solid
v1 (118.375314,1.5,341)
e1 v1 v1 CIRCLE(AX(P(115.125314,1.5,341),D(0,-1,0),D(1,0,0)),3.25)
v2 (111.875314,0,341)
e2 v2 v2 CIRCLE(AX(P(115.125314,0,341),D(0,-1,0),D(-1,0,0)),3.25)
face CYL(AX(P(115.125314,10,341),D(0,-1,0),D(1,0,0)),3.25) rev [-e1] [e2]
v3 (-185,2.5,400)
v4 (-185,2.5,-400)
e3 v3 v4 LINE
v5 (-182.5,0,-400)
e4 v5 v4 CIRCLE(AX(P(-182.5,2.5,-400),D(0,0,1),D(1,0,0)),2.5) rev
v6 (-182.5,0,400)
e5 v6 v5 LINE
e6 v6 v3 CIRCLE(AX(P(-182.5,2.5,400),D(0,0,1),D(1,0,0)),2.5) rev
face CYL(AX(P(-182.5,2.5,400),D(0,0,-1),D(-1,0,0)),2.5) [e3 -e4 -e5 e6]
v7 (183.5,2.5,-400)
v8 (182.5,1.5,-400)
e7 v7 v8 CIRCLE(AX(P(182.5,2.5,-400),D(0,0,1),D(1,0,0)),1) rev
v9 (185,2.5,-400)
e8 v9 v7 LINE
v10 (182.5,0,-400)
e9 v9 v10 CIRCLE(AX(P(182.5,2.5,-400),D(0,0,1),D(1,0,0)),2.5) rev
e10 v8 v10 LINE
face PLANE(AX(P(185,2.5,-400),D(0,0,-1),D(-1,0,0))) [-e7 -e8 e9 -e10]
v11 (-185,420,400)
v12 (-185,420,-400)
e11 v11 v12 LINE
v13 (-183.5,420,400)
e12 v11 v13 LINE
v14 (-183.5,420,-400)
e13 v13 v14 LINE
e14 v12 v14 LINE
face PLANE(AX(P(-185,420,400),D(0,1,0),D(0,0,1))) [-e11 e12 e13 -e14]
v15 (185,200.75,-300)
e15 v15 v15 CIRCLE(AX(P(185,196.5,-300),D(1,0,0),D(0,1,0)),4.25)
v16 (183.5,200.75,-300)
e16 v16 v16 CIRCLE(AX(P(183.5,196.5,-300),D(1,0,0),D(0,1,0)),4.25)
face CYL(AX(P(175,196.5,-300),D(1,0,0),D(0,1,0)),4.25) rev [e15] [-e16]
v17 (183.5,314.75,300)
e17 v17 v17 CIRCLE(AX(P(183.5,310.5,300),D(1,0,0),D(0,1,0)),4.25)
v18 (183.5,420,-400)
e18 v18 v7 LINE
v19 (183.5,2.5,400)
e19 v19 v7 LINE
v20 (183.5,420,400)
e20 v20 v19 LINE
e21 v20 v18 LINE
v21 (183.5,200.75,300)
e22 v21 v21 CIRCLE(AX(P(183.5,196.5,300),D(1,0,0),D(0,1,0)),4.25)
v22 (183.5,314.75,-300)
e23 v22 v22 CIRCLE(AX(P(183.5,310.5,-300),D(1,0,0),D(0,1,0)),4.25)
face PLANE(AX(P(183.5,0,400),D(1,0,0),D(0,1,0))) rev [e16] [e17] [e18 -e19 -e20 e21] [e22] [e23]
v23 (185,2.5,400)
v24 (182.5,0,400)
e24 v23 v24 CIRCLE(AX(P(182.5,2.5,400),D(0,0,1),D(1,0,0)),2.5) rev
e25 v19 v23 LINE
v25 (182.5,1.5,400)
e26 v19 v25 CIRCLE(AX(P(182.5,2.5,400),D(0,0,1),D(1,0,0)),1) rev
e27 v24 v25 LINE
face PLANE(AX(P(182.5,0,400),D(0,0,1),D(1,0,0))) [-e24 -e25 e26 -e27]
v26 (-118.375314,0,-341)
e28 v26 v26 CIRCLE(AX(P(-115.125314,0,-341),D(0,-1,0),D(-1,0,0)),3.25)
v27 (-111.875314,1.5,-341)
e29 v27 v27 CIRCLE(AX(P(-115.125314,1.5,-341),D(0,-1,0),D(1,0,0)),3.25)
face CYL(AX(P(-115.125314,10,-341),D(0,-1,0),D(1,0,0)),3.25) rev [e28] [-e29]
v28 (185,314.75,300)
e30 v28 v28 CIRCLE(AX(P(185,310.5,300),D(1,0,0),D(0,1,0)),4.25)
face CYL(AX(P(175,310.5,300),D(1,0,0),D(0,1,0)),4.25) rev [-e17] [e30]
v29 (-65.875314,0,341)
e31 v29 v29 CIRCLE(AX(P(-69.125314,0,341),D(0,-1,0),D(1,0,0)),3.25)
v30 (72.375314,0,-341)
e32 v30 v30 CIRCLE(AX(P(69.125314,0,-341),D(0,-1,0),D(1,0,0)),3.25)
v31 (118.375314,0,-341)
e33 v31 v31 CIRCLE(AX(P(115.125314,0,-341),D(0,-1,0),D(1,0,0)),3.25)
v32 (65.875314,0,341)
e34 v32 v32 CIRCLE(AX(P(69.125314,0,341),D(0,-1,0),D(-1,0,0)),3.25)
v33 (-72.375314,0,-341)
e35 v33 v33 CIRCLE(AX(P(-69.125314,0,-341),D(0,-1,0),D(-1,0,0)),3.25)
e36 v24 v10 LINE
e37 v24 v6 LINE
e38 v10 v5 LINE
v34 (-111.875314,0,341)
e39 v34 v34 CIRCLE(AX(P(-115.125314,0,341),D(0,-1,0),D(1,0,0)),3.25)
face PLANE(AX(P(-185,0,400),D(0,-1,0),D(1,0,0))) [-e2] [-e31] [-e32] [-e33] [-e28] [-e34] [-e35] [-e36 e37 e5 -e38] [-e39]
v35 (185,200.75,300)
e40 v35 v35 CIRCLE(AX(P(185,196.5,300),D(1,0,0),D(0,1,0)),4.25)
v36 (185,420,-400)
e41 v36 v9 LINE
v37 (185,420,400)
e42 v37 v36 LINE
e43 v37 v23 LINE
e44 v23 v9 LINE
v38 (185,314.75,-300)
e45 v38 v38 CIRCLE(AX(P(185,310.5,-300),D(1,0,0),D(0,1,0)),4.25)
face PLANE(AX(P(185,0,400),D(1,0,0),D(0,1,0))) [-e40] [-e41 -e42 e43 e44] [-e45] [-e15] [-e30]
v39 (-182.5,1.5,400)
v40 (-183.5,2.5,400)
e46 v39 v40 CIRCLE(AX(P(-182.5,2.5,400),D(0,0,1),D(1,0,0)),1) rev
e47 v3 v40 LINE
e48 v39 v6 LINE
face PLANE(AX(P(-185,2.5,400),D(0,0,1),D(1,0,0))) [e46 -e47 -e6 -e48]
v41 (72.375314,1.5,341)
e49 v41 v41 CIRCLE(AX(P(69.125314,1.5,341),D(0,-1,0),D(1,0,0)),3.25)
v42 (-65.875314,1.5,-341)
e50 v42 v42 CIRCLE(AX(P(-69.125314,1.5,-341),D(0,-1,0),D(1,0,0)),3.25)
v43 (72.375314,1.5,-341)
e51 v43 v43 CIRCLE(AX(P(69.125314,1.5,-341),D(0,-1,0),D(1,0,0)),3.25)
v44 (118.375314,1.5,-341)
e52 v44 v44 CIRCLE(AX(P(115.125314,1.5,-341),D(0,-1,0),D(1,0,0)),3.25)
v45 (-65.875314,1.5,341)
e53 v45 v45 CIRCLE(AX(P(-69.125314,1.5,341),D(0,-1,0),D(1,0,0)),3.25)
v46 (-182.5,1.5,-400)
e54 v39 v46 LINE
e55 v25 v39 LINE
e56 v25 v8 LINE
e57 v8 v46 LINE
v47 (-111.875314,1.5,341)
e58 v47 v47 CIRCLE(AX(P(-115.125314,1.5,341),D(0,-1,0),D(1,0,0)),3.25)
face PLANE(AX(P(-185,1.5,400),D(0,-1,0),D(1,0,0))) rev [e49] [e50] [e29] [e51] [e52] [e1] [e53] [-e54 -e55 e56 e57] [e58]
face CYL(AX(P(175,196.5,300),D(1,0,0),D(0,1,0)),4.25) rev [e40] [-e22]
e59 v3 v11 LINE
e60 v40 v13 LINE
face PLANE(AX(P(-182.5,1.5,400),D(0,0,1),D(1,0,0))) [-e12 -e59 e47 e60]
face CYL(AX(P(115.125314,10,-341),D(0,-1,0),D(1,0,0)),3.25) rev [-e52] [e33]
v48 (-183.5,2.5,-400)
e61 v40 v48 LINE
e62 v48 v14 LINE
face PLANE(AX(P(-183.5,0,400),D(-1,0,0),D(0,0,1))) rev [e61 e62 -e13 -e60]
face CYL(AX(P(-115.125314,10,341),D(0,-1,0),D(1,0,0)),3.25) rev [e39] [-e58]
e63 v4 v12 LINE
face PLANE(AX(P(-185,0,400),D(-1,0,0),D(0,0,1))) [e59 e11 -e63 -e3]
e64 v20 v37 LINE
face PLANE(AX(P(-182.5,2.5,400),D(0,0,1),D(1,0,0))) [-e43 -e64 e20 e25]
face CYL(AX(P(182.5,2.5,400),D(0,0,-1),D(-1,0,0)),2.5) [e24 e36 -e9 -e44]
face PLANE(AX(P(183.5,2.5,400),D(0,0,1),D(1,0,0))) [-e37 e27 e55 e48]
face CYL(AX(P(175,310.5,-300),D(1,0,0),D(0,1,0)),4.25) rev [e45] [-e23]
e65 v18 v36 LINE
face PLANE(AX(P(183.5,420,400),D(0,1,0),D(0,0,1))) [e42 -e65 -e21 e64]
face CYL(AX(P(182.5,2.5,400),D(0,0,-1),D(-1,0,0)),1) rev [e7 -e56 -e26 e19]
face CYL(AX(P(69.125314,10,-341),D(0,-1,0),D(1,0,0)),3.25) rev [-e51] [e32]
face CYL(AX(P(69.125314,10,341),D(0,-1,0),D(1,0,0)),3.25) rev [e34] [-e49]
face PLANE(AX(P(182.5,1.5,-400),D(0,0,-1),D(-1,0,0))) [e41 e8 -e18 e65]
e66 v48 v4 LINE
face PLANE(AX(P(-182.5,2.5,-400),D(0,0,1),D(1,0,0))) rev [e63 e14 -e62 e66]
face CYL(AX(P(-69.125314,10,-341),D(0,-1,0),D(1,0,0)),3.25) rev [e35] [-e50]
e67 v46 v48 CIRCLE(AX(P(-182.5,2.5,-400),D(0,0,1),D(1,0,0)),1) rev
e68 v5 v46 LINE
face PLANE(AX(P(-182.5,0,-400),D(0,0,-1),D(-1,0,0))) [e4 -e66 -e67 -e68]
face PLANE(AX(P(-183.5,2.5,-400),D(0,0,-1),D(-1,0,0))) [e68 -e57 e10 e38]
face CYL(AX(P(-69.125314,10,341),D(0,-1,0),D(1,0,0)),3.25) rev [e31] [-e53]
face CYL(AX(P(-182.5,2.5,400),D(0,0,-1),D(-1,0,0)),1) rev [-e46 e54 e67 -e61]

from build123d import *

# Parameters (mm, degrees)
TABAN_FLAN_1_DEPTH    = 400
IZIM6_R               = 3.25
KES_EKSTR_ZYON1_DEPTH = 10
IZIM7_R               = 4.25
KES_EKSTR_ZYON2_DEPTH = 10


# Sheet-metal steps are written as plain solids
with BuildPart() as part:
    # Çizim1 → Taban-Flanş1 (new, symmetric)
    with BuildSketch(Plane.XY):
        with BuildLine():
            Line((-185, 420), (-185, 2.5))
            ThreePointArc((-185, 2.5), (-184.267766953, 0.732233047), (-182.5, 0))
            Line((-182.5, 0), (182.5, 0))
            ThreePointArc((182.5, 0), (184.267766953, 0.732233047), (185, 2.5))
            Line((185, 2.5), (185, 420))
            Line((185, 420), (183.5, 420))
            Line((183.5, 420), (183.5, 2.5))
            ThreePointArc((183.5, 2.5), (183.207106781, 1.792893219), (182.5, 1.5))
            Line((182.5, 1.5), (-182.5, 1.5))
            ThreePointArc((-182.5, 1.5), (-183.207106781, 1.792893219), (-183.5, 2.5))
            Line((-183.5, 2.5), (-183.5, 420))
            Line((-183.5, 420), (-185, 420))
        make_face()
    extrude(amount=TABAN_FLAN_1_DEPTH, both=True)

    # Çizim6 → Kes-Ekstrüzyon1 (cut)
    with BuildSketch(Plane.XZ):
        with Locations((-115.125314072, 341)):
            Circle(IZIM6_R)
        with Locations((-69.125314072, 341)):
            Circle(IZIM6_R)
        with Locations((69.125314072, 341)):
            Circle(IZIM6_R)
        with Locations((115.125314072, 341)):
            Circle(IZIM6_R)
        with Locations((115.125314072, -341)):
            Circle(IZIM6_R)
        with Locations((69.125314072, -341)):
            Circle(IZIM6_R)
        with Locations((-69.125314072, -341)):
            Circle(IZIM6_R)
        with Locations((-115.125314072, -341)):
            Circle(IZIM6_R)
    extrude(amount=-KES_EKSTR_ZYON1_DEPTH, mode=Mode.SUBTRACT)

    # Çizim7 → Kes-Ekstrüzyon2 (cut)
    with BuildSketch(Plane(origin=(185, 0, 0), x_dir=(0, 0, -1), z_dir=(1, 0, 0))):
        with Locations(Location((-300, 310.5, 0), (0, 0, 90))):
            Circle(IZIM7_R)
        with Locations(Location((-300, 196.5, 0), (0, 0, 90))):
            Circle(IZIM7_R)
        with Locations(Location((300, 196.5, 0), (0, 0, 90))):
            Circle(IZIM7_R)
        with Locations(Location((300, 310.5, 0), (0, 0, 90))):
            Circle(IZIM7_R)
    extrude(amount=-KES_EKSTR_ZYON2_DEPTH, mode=Mode.SUBTRACT)


solid = part.part
